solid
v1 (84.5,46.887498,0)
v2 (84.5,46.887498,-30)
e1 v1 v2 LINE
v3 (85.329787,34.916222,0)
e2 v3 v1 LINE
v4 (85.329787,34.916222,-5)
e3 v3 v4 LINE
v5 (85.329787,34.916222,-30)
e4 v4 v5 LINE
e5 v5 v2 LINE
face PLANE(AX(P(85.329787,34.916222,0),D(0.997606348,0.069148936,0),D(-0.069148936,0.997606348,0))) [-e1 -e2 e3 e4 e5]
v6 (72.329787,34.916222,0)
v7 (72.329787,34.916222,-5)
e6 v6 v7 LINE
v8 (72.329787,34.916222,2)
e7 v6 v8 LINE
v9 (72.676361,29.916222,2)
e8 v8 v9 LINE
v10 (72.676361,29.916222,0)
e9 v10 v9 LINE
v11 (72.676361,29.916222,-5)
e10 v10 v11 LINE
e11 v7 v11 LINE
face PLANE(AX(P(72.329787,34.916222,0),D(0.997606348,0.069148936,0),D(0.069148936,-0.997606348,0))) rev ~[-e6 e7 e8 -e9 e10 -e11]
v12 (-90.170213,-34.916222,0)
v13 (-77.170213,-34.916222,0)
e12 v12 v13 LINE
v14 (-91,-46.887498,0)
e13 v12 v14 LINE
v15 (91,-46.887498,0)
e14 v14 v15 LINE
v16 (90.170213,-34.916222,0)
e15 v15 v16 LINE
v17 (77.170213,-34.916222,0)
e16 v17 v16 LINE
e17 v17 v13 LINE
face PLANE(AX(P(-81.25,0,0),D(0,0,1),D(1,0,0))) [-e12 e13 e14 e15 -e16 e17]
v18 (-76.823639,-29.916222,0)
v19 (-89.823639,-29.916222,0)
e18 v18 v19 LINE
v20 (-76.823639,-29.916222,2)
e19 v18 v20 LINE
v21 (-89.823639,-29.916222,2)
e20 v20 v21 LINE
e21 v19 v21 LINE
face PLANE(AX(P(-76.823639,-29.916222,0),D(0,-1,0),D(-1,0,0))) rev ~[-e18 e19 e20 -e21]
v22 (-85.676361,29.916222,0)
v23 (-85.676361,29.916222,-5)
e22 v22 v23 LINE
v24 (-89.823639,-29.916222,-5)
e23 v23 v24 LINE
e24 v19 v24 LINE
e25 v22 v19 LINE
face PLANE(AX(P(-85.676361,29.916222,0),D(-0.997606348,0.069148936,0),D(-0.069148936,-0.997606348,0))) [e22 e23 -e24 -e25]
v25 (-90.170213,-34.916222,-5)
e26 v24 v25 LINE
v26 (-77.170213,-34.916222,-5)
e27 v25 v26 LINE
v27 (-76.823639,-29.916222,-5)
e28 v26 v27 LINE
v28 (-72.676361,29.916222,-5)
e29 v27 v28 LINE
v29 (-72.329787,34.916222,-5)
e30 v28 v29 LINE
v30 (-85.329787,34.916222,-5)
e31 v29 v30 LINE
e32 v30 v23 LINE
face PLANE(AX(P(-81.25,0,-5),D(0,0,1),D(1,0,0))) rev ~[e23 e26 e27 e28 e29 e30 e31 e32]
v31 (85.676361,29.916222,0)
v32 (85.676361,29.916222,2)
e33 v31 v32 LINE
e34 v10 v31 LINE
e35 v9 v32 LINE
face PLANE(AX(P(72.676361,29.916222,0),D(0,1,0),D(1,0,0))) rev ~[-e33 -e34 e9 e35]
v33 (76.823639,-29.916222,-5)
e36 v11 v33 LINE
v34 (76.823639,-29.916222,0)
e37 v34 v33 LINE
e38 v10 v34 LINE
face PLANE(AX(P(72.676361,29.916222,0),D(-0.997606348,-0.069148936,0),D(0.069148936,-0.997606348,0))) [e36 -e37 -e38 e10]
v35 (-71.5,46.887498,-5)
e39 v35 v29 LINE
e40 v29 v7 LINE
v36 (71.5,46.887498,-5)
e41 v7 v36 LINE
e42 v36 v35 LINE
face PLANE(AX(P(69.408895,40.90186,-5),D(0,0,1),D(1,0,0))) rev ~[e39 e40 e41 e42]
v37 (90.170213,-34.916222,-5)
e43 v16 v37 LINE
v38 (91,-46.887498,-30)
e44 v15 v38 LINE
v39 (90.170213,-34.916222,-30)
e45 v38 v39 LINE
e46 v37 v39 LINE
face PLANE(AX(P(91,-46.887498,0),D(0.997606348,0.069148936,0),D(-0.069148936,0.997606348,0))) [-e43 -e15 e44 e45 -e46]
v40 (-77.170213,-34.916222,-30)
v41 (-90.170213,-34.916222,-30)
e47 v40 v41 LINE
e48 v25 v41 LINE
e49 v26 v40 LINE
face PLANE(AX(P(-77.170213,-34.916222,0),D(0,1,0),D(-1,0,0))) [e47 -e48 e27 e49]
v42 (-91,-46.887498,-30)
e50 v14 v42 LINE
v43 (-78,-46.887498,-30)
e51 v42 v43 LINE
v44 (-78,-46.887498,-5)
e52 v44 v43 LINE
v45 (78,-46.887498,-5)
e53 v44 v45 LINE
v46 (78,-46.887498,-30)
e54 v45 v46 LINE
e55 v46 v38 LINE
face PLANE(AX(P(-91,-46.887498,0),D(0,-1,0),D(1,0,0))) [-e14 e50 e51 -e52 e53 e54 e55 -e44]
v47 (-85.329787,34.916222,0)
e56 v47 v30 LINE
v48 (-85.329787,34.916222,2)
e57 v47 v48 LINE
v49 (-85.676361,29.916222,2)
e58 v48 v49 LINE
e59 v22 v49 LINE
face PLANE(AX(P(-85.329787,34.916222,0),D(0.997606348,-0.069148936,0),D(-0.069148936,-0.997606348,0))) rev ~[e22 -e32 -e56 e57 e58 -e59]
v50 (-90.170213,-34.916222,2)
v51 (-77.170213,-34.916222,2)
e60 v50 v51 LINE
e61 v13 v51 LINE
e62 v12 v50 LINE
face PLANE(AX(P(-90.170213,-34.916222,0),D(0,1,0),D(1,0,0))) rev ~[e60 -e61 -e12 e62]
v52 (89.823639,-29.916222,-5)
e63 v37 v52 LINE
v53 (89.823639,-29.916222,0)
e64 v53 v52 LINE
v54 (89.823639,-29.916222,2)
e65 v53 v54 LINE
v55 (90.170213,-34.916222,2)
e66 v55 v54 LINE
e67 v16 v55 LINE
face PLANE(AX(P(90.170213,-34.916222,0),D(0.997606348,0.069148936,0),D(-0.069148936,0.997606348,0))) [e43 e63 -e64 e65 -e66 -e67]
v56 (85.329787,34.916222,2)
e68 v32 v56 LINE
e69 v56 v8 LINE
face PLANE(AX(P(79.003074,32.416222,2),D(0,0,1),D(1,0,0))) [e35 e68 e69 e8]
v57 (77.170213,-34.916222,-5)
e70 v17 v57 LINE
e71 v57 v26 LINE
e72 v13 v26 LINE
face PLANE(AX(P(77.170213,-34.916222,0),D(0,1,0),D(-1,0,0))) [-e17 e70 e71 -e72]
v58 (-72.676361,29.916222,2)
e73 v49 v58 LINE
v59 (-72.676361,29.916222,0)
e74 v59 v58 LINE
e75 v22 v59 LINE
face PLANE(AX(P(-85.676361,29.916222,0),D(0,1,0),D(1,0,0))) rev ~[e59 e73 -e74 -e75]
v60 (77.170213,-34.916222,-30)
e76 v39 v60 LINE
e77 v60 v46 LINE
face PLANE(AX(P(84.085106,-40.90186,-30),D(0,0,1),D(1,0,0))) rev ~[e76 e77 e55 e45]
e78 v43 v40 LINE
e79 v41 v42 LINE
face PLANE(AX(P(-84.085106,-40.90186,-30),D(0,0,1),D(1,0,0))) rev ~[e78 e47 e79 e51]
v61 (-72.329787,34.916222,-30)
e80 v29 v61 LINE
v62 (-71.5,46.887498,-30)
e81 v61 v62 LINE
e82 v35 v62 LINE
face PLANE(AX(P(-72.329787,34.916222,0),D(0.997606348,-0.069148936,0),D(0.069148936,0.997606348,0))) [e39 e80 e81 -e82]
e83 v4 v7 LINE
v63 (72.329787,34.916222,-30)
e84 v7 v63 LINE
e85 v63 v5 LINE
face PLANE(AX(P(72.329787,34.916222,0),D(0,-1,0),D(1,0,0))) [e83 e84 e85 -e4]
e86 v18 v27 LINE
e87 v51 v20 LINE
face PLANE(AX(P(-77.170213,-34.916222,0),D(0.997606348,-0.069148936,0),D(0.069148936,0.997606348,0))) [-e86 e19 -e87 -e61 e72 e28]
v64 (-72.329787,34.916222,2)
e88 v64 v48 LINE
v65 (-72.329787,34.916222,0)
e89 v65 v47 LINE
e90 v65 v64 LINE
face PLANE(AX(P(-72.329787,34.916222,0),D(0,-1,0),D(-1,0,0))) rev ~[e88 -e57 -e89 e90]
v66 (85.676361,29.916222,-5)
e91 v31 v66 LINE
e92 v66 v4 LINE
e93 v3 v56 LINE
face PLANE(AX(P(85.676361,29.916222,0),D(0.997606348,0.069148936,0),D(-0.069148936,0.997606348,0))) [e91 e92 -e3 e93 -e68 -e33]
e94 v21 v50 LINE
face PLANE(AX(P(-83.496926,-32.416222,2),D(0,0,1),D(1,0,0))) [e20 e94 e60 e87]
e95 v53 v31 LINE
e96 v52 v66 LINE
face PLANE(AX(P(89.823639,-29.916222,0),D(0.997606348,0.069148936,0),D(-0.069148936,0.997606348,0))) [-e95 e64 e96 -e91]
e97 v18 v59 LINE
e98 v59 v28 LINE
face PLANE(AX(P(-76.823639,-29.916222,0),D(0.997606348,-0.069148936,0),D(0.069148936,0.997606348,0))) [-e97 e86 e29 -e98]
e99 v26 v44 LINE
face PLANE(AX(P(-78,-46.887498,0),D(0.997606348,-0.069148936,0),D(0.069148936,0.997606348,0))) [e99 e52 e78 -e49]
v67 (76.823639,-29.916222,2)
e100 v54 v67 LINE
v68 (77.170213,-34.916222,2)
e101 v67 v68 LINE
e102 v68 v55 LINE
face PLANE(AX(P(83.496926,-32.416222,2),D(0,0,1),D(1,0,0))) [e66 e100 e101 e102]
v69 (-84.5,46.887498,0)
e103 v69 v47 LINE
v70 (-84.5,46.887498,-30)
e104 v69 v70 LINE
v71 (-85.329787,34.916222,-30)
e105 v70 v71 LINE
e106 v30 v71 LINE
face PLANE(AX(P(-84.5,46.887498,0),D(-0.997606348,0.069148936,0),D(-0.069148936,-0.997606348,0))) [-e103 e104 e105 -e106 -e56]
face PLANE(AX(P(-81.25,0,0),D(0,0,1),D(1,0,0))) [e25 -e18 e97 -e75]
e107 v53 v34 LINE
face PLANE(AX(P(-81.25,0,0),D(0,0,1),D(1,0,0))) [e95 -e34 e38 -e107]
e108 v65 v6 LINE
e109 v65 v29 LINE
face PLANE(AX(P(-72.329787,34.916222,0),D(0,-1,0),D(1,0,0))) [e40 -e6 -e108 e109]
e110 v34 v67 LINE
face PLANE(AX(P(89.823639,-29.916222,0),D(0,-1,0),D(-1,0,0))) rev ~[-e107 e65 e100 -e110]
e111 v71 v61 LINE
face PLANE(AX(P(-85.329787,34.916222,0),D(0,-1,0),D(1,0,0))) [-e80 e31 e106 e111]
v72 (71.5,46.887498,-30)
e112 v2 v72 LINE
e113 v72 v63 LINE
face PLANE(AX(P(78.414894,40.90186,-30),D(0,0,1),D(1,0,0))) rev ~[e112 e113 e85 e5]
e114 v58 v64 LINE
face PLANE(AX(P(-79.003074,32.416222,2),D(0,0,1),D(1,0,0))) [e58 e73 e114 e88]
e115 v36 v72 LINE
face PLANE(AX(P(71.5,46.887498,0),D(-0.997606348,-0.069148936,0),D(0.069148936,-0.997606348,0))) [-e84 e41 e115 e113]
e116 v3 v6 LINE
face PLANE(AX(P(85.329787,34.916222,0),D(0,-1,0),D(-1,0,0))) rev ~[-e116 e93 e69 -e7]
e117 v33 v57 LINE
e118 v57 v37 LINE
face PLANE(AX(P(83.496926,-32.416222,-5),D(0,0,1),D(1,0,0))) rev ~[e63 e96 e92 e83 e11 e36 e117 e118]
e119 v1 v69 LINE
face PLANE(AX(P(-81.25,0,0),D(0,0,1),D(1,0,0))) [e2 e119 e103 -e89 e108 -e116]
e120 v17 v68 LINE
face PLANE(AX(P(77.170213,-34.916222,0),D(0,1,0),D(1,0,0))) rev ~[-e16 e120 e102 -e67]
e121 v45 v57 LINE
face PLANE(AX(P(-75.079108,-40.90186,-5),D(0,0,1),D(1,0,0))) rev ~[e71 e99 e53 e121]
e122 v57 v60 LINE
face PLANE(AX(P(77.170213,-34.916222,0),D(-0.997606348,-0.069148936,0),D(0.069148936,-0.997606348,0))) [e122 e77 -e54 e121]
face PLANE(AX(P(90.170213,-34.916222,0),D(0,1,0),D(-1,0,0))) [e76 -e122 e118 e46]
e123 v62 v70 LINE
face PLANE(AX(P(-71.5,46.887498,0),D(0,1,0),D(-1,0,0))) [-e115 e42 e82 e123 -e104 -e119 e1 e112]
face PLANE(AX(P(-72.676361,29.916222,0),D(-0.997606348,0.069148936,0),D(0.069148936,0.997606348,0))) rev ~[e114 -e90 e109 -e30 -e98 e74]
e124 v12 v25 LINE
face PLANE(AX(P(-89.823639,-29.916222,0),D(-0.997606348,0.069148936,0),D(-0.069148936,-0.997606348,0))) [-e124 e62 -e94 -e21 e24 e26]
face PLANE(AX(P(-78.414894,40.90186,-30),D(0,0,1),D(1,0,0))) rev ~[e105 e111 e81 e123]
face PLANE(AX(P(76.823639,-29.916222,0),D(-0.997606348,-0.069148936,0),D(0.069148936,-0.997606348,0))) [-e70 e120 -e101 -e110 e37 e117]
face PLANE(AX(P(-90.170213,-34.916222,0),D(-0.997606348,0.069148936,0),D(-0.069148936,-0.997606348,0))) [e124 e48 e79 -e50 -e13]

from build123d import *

# Parameters (mm, degrees)
F1_DEPTH = 30
F2_DEPTH = 5
F3_DEPTH = 2


with BuildPart() as f1:
    # F0 (on Top) → F1 (new body)
    with BuildSketch(Plane.XY):
        Polygon((-84.5, 46.8874983338), (-85.329787234, 34.9162221635), (-72.329787234, 34.9162221635), (-71.5, 46.8874983338), align=None)
    extrude(amount=-F1_DEPTH)



with BuildPart() as f1b:
    # F0 (on Top) → F1, piece 2 (new body)
    with BuildSketch(Plane.XY):
        Polygon((71.5, 46.8874983338), (72.329787234, 34.9162221635), (85.329787234, 34.9162221635), (84.5, 46.8874983338), align=None)
    extrude(amount=-F1_DEPTH)


with BuildPart() as f1c:
    # F0 (on Top) → F1, piece 3 (new body)
    with BuildSketch(Plane.XY):
        Polygon((77.170212766, -34.9162221635), (78, -46.8874983338), (91, -46.8874983338), (90.170212766, -34.9162221635), align=None)
    extrude(amount=-F1_DEPTH)


with BuildPart() as f1d:
    # F0 (on Top) → F1, piece 4 (new body)
    with BuildSketch(Plane.XY):
        Polygon((-90.170212766, -34.9162221635), (-91, -46.8874983338), (-78, -46.8874983338), (-77.170212766, -34.9162221635), align=None)
    extrude(amount=-F1_DEPTH)


with BuildPart() as f1_1:
    add(f1.part)

    add(f1b.part)  # F2 merges F1b

    add(f1c.part)  # F2 merges F1c

    add(f1d.part)  # F2 merges F1d
    # F0 (on Top) → F2 (join)
    with BuildSketch(Plane.XY):
        Polygon((-85.6763614932, 29.9162221635), (-89.8236385068, -29.9162221635), (-76.8236385068, -29.9162221635), (-72.6763614932, 29.9162221635), align=None)
        Polygon((-85.329787234, 34.9162221635), (-85.6763614932, 29.9162221635), (-72.6763614932, 29.9162221635), (-72.329787234, 34.9162221635), align=None)
        Polygon((-89.8236385068, -29.9162221635), (-90.170212766, -34.9162221635), (-77.170212766, -34.9162221635), (-76.8236385068, -29.9162221635), align=None)
        Polygon((-77.170212766, -34.9162221635), (-78, -46.8874983338), (-72.988003021, -46.8874983338), (-72.158215787, -34.9162221635), align=None)
        Polygon((-72.158215787, -34.9162221635), (-72.988003021, -46.8874983338), (72.988003021, -46.8874983338), (72.158215787, -34.9162221635), align=None)
        Polygon((72.158215787, -34.9162221635), (72.988003021, -46.8874983338), (78, -46.8874983338), (77.170212766, -34.9162221635), align=None)
        Polygon((76.8236385068, -29.9162221635), (77.170212766, -34.9162221635), (90.170212766, -34.9162221635), (89.8236385068, -29.9162221635), align=None)
        Polygon((72.6763614932, 29.9162221635), (76.8236385068, -29.9162221635), (89.8236385068, -29.9162221635), (85.6763614932, 29.9162221635), align=None)
        Polygon((72.329787234, 34.9162221635), (72.6763614932, 29.9162221635), (85.6763614932, 29.9162221635), (85.329787234, 34.9162221635), align=None)
        Polygon((66.488003021, 46.8874983338), (67.3177902551, 34.9162221635), (72.329787234, 34.9162221635), (71.5, 46.8874983338), align=None)
        Polygon((-66.488003021, 46.8874983338), (-67.3177902551, 34.9162221635), (67.3177902551, 34.9162221635), (66.488003021, 46.8874983338), align=None)
        Polygon((-71.5, 46.8874983338), (-72.329787234, 34.9162221635), (-67.3177902551, 34.9162221635), (-66.488003021, 46.8874983338), align=None)
    extrude(amount=-F2_DEPTH)

    # F0 (on Top) → F3 (join)
    with BuildSketch(Plane.XY):
        Polygon((-85.329787234, 34.9162221635), (-85.6763614932, 29.9162221635), (-72.6763614932, 29.9162221635), (-72.329787234, 34.9162221635), align=None)
        Polygon((-89.8236385068, -29.9162221635), (-90.170212766, -34.9162221635), (-77.170212766, -34.9162221635), (-76.8236385068, -29.9162221635), align=None)
        Polygon((72.329787234, 34.9162221635), (72.6763614932, 29.9162221635), (85.6763614932, 29.9162221635), (85.329787234, 34.9162221635), align=None)
        Polygon((76.8236385068, -29.9162221635), (77.170212766, -34.9162221635), (90.170212766, -34.9162221635), (89.8236385068, -29.9162221635), align=None)
    extrude(amount=F3_DEPTH)


solid = f1_1.part
